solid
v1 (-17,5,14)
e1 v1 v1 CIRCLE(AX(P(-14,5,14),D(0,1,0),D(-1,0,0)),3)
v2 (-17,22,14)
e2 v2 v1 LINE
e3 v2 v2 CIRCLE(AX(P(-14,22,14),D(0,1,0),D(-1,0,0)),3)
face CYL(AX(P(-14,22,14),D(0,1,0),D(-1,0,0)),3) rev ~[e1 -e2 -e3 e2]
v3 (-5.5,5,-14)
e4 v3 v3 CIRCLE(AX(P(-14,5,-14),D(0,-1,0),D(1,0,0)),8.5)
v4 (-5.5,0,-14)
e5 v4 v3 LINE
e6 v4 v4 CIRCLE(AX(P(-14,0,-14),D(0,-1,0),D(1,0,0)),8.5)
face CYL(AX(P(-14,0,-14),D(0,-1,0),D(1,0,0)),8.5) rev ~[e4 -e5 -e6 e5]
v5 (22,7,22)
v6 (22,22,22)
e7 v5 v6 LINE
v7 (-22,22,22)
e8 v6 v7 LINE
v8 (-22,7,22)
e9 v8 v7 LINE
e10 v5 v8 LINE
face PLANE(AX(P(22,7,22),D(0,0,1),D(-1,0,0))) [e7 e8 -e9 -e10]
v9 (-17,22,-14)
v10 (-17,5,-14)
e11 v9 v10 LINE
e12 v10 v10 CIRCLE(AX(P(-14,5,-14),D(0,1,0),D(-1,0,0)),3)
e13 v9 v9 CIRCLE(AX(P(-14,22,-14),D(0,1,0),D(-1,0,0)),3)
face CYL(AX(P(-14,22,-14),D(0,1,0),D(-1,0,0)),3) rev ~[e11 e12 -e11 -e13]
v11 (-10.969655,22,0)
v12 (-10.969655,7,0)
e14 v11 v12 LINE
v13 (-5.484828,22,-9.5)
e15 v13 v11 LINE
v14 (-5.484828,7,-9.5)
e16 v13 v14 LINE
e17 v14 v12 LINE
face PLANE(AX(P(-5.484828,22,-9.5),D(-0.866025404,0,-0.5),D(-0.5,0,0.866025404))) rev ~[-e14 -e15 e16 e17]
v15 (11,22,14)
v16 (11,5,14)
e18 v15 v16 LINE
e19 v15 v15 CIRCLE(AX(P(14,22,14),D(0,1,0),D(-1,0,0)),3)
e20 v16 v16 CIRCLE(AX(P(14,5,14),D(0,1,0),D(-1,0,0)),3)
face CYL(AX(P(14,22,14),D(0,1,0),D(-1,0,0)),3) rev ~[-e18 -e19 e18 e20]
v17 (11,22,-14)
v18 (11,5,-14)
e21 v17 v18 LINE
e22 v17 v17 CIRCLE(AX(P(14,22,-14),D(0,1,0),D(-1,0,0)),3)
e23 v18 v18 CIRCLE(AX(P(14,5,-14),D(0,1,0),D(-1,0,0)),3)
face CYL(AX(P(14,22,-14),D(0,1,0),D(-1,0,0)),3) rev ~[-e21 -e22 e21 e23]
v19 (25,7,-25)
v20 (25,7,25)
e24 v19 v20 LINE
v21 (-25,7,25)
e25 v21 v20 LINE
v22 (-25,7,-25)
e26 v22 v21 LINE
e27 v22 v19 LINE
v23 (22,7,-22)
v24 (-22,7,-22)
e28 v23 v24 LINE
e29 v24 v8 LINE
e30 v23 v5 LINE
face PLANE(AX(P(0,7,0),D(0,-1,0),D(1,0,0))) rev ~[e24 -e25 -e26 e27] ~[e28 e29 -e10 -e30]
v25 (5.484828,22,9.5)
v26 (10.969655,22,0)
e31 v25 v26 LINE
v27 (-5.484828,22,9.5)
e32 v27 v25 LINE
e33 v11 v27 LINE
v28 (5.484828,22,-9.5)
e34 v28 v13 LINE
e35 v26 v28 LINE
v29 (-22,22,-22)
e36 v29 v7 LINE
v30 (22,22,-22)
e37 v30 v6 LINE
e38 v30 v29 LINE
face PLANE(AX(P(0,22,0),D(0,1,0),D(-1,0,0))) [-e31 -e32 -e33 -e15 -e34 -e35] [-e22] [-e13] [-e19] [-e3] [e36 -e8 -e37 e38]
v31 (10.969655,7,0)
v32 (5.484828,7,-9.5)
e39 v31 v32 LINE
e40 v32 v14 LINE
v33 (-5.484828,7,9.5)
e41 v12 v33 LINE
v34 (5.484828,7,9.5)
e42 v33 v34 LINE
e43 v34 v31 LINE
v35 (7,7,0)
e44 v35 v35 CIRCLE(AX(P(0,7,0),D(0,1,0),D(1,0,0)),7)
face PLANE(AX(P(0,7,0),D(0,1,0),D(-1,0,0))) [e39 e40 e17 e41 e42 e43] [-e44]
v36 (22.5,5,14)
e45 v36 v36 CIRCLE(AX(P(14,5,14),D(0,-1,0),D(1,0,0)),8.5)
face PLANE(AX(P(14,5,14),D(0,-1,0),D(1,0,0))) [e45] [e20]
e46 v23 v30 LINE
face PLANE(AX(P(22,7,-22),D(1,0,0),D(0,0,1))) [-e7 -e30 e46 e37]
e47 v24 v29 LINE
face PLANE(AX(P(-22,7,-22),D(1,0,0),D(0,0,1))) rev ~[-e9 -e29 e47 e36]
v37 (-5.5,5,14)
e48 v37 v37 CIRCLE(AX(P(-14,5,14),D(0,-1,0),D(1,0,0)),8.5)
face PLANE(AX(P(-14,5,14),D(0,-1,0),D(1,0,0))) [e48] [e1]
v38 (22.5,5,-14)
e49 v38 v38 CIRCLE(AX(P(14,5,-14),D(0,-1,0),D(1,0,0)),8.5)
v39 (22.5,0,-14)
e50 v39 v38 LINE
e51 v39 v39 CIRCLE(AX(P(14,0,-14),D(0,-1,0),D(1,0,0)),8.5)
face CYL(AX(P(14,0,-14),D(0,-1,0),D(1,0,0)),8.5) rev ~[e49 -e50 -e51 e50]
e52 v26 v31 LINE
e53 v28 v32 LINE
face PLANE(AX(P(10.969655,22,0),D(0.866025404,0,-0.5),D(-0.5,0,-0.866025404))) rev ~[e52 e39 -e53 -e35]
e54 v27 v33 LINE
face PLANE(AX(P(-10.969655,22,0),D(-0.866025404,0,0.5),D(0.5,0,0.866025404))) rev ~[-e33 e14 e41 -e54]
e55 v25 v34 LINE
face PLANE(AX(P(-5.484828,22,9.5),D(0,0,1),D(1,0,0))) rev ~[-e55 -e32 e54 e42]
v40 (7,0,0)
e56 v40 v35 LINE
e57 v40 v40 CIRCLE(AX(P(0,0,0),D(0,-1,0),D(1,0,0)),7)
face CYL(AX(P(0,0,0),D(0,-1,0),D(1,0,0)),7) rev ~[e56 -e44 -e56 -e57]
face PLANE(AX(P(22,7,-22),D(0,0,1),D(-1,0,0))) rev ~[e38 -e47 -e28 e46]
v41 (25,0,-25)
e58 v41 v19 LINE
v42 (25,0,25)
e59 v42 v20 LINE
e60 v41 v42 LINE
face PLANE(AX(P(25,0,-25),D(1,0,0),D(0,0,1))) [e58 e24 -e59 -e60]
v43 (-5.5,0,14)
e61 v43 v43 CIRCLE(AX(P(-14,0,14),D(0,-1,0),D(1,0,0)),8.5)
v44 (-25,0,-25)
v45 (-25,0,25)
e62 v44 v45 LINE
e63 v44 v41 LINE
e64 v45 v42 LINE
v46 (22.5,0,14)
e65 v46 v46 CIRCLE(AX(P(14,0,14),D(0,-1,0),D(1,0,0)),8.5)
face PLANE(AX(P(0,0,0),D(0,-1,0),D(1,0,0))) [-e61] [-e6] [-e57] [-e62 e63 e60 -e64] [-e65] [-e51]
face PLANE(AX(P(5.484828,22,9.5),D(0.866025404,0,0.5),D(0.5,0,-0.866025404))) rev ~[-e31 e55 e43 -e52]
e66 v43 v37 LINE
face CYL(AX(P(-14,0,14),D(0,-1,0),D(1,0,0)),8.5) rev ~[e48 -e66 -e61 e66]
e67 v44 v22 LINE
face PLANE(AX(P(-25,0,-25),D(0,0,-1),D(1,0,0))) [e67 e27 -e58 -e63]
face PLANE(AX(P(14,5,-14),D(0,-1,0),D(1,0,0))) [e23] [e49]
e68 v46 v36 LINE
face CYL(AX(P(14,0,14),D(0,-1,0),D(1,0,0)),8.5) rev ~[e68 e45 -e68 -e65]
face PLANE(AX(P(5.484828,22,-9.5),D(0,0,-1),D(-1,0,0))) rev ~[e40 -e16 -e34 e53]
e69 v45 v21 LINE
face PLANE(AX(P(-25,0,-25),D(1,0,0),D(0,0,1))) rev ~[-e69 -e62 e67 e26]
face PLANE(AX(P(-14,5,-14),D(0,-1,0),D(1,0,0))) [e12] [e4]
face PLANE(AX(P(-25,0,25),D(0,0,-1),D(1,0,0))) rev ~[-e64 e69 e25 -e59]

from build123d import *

# Parameters (mm, degrees)
F0_W      = 50
F0_H      = 50
F1_DEPTH  = 7
F2_W      = 44
F2_H      = 44
F3_DEPTH  = 15
F4_R      = 3
F5_DEPTH  = 25
F7_R      = 7
F8_DEPTH  = 25
F9_R      = 7
F10_DEPTH = 15
F6_R      = 8.5
F11_DEPTH = 5


# Not quite as in the source:
# - a feature names something its author has since deleted; it is built from what else it names


with BuildPart() as f1:
    # F0 (on Front) → F1 (new body)
    with BuildSketch(Plane.XZ):
        Rectangle(F0_W, F0_H)
    extrude(amount=-F1_DEPTH)

    # F2 (on face) → F3 (join)
    with BuildSketch(Plane(origin=(0, 7, 0), x_dir=(-1, 0, 0), z_dir=(0, 1, 0))):
        Rectangle(F2_W, F2_H)
    extrude(amount=F3_DEPTH)

    # F4 (on face) → F5 (cut)
    with BuildSketch(Plane(origin=(0, 22, 0), x_dir=(-1, 0, 0), z_dir=(0, 1, 0))):
        with Locations((-14, 14)):
            Circle(F4_R)
        with Locations((14, 14)):
            Circle(F4_R)
        with Locations((14, -14)):
            Circle(F4_R)
        with Locations((-14, -14)):
            Circle(F4_R)
    extrude(amount=-F5_DEPTH, mode=Mode.SUBTRACT)

    # F7 (on face) → F8 (cut)
    with BuildSketch(Plane.XZ):
        Circle(F7_R)
    extrude(amount=-F8_DEPTH, mode=Mode.SUBTRACT)

    # F9 (on face) → F10 (cut)
    with BuildSketch(Plane(origin=(0, 22, 0), x_dir=(-1, 0, 0), z_dir=(0, 1, 0))):
        Polygon((-5.4848275573, -9.5), (5.4848275573, -9.5), (10.9696551146, 0), (5.4848275573, 9.5), (-5.4848275573, 9.5), (-10.9696551146, 0), align=None)
        Circle(F9_R, mode=Mode.SUBTRACT)
    extrude(amount=-F10_DEPTH, mode=Mode.SUBTRACT)

    # F6 (on face) → F11 (cut)
    with BuildSketch(Plane.XZ):
        with Locations((-14, 14)):
            Circle(F6_R)
        with Locations((-14, -14)):
            Circle(F6_R)
        with Locations((14, -14)):
            Circle(F6_R)
        with Locations((14, 14)):
            Circle(F6_R)
    extrude(amount=-F11_DEPTH, mode=Mode.SUBTRACT)


solid = f1.part
